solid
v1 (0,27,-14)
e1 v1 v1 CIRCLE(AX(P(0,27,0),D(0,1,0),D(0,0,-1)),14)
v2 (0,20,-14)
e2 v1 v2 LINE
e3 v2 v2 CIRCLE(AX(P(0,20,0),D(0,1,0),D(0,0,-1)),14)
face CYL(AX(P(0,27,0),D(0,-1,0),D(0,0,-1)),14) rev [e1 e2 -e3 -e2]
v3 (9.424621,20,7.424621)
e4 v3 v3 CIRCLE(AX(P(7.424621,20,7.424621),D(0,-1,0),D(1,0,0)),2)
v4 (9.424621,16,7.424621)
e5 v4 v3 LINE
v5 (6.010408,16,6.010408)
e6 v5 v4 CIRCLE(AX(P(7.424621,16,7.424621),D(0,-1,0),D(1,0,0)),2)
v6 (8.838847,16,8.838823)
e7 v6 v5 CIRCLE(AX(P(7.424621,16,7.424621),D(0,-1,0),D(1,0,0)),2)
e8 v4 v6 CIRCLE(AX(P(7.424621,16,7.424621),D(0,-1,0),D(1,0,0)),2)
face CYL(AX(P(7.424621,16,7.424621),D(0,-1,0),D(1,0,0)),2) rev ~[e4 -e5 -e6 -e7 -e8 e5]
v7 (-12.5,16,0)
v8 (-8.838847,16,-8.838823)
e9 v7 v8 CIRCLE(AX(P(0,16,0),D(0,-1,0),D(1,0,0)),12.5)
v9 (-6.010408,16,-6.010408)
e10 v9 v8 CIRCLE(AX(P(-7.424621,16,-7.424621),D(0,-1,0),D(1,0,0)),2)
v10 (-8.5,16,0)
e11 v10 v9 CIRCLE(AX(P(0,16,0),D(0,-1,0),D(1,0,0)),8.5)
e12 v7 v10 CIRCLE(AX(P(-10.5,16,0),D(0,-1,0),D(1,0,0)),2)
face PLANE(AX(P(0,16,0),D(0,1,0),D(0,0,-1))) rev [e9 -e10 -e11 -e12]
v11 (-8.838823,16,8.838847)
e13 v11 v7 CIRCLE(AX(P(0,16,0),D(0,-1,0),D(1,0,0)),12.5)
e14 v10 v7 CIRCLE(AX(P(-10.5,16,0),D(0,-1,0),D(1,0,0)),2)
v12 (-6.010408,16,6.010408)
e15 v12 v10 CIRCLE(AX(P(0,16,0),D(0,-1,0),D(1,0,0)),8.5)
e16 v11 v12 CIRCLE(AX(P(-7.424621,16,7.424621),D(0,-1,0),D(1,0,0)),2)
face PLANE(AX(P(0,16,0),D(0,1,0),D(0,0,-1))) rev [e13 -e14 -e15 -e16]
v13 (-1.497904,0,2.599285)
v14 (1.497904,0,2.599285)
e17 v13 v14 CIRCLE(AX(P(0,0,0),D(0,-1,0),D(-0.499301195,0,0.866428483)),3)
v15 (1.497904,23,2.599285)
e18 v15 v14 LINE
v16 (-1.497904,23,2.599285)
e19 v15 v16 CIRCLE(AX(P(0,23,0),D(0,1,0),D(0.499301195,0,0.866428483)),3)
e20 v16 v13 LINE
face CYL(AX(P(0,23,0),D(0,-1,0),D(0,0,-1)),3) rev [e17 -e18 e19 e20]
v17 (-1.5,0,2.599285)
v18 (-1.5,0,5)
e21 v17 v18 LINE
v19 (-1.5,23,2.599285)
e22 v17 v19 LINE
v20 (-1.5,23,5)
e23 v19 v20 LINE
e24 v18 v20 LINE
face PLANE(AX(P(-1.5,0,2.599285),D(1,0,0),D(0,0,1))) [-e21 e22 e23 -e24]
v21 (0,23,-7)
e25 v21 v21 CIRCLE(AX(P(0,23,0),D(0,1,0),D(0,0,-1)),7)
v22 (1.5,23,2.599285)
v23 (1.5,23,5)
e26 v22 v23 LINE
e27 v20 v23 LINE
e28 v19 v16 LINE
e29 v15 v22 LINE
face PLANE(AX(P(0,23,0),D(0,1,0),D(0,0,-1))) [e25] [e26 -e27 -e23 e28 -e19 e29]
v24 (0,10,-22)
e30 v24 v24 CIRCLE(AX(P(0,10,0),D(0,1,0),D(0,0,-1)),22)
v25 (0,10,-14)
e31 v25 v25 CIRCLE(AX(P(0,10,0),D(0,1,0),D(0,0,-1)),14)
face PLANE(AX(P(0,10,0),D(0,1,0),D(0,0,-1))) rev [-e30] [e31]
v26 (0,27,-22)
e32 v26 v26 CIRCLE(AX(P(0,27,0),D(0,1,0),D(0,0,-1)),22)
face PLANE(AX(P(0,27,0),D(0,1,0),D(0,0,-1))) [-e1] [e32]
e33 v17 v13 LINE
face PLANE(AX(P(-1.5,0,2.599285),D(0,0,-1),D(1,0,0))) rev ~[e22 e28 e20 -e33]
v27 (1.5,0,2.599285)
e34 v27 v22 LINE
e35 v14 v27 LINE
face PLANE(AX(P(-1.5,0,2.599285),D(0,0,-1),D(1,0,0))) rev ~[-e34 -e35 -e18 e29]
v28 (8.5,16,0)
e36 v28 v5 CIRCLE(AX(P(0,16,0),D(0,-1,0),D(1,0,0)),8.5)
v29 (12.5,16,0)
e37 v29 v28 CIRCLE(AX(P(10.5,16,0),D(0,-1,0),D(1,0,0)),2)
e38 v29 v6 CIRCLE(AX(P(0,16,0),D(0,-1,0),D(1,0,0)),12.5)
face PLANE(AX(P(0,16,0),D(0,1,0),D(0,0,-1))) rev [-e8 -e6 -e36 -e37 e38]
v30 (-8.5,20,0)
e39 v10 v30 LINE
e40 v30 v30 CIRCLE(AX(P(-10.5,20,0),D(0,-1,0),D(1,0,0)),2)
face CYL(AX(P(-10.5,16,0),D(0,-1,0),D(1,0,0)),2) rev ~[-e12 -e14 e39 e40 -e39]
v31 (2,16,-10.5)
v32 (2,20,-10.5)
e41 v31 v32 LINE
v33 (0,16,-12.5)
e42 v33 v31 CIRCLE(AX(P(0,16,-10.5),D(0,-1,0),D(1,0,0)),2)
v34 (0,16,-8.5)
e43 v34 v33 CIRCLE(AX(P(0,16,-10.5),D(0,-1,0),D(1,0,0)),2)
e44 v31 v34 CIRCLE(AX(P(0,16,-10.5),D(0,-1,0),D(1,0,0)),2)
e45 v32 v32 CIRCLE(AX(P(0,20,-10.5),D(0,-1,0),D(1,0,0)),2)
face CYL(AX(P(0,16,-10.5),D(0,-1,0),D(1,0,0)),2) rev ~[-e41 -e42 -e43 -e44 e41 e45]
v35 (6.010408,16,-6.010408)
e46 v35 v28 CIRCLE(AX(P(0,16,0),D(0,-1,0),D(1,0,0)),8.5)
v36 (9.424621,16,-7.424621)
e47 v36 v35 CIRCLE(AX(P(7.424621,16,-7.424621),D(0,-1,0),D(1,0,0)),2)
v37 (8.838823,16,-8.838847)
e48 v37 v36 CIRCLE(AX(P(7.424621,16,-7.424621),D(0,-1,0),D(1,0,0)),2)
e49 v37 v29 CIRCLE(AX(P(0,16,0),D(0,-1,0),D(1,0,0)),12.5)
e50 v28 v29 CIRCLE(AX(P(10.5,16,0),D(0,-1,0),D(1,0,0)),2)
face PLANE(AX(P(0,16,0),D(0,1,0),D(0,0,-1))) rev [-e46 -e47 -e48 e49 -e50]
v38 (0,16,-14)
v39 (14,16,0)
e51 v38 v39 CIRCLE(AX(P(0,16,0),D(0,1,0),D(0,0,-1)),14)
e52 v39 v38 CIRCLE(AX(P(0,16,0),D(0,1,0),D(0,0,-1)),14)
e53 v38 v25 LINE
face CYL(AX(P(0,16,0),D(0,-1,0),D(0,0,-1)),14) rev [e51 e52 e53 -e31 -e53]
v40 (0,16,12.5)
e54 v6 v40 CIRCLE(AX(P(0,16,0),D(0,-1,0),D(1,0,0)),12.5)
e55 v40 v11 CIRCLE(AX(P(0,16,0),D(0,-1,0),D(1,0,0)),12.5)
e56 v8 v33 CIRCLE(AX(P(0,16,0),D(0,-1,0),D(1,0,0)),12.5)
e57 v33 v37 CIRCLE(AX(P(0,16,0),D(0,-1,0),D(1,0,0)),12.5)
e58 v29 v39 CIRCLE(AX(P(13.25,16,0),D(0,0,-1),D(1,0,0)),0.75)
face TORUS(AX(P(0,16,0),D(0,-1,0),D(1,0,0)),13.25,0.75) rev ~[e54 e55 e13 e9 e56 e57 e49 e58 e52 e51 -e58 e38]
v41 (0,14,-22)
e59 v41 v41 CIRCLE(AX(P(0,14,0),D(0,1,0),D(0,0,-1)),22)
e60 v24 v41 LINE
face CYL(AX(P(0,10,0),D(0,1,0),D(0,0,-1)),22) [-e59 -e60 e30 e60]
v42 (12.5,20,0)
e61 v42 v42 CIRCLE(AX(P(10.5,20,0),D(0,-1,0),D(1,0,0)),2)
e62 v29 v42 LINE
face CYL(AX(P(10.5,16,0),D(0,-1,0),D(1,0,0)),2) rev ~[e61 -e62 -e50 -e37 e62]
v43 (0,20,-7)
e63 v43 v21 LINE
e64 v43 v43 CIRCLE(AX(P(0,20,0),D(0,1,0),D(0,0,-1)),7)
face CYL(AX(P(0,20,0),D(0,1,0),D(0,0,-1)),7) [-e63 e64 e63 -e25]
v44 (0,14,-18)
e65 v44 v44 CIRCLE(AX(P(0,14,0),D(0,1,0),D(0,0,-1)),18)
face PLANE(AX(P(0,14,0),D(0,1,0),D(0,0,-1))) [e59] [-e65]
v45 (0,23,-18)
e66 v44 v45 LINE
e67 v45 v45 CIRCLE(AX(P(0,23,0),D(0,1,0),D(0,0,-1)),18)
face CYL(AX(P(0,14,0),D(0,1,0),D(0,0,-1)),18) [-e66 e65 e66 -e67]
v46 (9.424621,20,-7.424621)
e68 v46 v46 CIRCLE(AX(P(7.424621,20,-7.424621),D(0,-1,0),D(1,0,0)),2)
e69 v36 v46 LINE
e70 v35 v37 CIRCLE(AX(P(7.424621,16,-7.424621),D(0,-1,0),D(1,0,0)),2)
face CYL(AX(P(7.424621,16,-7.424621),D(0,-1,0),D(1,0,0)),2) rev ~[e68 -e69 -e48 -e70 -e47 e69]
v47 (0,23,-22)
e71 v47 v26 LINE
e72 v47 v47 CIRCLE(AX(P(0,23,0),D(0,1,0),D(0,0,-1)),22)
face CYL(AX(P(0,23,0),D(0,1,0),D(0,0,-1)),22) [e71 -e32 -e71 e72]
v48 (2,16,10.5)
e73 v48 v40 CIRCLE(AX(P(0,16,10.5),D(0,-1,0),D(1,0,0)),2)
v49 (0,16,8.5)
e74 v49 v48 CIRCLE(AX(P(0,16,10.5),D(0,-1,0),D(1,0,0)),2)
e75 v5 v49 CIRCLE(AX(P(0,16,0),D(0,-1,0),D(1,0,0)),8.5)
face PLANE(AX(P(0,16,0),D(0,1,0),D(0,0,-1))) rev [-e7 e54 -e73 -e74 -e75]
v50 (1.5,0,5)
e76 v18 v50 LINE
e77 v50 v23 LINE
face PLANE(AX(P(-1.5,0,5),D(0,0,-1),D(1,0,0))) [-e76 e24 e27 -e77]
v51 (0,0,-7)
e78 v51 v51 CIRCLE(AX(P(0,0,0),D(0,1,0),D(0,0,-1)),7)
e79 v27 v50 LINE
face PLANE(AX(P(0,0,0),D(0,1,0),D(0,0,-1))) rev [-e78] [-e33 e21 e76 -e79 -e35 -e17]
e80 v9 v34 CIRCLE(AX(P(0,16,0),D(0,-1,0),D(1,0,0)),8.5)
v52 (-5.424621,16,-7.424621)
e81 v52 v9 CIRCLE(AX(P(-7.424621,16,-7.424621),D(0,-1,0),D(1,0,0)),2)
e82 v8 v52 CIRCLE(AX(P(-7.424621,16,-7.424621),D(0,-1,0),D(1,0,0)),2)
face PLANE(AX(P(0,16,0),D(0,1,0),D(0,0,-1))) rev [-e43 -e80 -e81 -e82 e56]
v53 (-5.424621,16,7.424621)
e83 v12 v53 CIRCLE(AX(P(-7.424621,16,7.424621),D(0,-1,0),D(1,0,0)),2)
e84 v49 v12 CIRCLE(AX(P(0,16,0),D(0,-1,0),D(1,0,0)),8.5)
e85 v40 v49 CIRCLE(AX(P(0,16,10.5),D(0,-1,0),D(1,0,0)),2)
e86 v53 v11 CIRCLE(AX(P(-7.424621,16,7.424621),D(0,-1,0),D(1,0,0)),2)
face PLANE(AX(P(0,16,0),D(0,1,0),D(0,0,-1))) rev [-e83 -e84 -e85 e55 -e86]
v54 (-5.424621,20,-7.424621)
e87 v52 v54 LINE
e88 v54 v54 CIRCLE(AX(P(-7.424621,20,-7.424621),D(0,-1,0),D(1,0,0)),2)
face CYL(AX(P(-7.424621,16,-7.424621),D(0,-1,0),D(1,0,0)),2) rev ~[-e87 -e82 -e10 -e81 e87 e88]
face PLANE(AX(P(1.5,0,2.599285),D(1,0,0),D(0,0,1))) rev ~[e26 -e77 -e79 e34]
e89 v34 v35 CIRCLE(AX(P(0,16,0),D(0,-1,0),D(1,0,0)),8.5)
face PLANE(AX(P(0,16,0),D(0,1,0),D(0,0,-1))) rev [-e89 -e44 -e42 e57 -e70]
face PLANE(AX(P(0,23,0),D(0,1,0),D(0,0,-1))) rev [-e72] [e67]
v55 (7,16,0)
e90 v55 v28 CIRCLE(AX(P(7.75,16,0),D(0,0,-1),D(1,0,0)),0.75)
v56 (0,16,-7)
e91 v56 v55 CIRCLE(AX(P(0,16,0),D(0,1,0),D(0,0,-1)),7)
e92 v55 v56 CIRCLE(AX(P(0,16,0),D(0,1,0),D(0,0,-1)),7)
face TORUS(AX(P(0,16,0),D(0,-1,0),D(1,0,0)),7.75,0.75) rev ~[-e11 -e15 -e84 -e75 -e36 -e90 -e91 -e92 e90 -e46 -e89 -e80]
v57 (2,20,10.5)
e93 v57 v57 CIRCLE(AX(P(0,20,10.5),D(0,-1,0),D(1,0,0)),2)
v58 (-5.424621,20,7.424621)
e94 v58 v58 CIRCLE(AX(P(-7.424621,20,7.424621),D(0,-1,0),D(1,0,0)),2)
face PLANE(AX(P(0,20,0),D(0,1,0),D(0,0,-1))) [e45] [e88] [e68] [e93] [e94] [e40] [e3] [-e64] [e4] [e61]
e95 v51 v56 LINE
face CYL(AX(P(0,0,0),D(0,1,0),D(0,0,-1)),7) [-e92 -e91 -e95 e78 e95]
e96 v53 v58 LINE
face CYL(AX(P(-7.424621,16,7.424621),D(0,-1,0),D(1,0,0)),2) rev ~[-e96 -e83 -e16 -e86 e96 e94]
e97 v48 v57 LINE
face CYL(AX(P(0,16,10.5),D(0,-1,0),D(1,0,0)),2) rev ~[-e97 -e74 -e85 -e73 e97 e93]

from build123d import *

# Parameters (mm, degrees)
F2_W     = 3
F2_H     = 2.4007145502
F4_DEPTH = 23
F3_R     = 2
F5_DEPTH = 4
F7_R     = 0.75
F9_R     = 0.75


with BuildPart() as f1:
    # F0 (on Right) → F1 (revolve)
    with BuildSketch(Plane.YZ):
        Polygon((23, -3), (0, -3), (0, -7), (16, -7), (16, -14), (10, -14), (10, -22), (14, -22), (14, -18), (23, -18), (23, -22), (27, -22), (27, -14), (20, -14), (20, -7), (23, -7), align=None)
    revolve(axis=Axis((0, 11.4535925208, 0), (0, 1, 0)))

    # F2 (on Front) → F4 (cut, through all)
    with BuildSketch(Plane.XZ):
        with Locations((0, 3.7996427249)):
            Rectangle(F2_W, F2_H)
    extrude(amount=-F4_DEPTH, mode=Mode.SUBTRACT)

    # F3 (on face) → F5 (cut, through all)
    with BuildSketch(Plane.XZ.offset(-16)):
        with Locations((0, 10.5)):
            Circle(F3_R)
        with Locations((7.4246212025, 7.4246212025)):
            Circle(F3_R)
        with Locations((10.5, 0)):
            Circle(F3_R)
        with Locations((7.4246212025, -7.4246212025)):
            Circle(F3_R)
        with Locations((0, -10.5)):
            Circle(F3_R)
        with Locations((-7.4246212025, -7.4246212025)):
            Circle(F3_R)
        with Locations((-10.5, 0)):
            Circle(F3_R)
        with Locations((-7.4246212025, 7.4246212025)):
            Circle(F3_R)
    extrude(amount=-F5_DEPTH, mode=Mode.SUBTRACT)

    # F8: sweep along a path in F6
    with BuildLine(Plane.XZ.offset(-16)) as f8_path:
        CenterArc((0, 0), 13.25, 0, 360)
    # F7 (on Top) → F8 (sweep, cut)
    with BuildSketch(Plane.XY):
        with Locations((13.25, 16)):
            Circle(F7_R)
    sweep(path=f8_path.line, mode=Mode.SUBTRACT)

    # F11: sweep along a path in F10
    with BuildLine(Plane.XZ.offset(-16)) as f11_path:
        CenterArc((0, 0), 7.75, 0, 360)
    # F9 (on Top) → F11 (sweep, cut)
    with BuildSketch(Plane.XY):
        with Locations((7.75, 16)):
            Circle(F9_R)
    sweep(path=f11_path.line, mode=Mode.SUBTRACT)


solid = f1.part
